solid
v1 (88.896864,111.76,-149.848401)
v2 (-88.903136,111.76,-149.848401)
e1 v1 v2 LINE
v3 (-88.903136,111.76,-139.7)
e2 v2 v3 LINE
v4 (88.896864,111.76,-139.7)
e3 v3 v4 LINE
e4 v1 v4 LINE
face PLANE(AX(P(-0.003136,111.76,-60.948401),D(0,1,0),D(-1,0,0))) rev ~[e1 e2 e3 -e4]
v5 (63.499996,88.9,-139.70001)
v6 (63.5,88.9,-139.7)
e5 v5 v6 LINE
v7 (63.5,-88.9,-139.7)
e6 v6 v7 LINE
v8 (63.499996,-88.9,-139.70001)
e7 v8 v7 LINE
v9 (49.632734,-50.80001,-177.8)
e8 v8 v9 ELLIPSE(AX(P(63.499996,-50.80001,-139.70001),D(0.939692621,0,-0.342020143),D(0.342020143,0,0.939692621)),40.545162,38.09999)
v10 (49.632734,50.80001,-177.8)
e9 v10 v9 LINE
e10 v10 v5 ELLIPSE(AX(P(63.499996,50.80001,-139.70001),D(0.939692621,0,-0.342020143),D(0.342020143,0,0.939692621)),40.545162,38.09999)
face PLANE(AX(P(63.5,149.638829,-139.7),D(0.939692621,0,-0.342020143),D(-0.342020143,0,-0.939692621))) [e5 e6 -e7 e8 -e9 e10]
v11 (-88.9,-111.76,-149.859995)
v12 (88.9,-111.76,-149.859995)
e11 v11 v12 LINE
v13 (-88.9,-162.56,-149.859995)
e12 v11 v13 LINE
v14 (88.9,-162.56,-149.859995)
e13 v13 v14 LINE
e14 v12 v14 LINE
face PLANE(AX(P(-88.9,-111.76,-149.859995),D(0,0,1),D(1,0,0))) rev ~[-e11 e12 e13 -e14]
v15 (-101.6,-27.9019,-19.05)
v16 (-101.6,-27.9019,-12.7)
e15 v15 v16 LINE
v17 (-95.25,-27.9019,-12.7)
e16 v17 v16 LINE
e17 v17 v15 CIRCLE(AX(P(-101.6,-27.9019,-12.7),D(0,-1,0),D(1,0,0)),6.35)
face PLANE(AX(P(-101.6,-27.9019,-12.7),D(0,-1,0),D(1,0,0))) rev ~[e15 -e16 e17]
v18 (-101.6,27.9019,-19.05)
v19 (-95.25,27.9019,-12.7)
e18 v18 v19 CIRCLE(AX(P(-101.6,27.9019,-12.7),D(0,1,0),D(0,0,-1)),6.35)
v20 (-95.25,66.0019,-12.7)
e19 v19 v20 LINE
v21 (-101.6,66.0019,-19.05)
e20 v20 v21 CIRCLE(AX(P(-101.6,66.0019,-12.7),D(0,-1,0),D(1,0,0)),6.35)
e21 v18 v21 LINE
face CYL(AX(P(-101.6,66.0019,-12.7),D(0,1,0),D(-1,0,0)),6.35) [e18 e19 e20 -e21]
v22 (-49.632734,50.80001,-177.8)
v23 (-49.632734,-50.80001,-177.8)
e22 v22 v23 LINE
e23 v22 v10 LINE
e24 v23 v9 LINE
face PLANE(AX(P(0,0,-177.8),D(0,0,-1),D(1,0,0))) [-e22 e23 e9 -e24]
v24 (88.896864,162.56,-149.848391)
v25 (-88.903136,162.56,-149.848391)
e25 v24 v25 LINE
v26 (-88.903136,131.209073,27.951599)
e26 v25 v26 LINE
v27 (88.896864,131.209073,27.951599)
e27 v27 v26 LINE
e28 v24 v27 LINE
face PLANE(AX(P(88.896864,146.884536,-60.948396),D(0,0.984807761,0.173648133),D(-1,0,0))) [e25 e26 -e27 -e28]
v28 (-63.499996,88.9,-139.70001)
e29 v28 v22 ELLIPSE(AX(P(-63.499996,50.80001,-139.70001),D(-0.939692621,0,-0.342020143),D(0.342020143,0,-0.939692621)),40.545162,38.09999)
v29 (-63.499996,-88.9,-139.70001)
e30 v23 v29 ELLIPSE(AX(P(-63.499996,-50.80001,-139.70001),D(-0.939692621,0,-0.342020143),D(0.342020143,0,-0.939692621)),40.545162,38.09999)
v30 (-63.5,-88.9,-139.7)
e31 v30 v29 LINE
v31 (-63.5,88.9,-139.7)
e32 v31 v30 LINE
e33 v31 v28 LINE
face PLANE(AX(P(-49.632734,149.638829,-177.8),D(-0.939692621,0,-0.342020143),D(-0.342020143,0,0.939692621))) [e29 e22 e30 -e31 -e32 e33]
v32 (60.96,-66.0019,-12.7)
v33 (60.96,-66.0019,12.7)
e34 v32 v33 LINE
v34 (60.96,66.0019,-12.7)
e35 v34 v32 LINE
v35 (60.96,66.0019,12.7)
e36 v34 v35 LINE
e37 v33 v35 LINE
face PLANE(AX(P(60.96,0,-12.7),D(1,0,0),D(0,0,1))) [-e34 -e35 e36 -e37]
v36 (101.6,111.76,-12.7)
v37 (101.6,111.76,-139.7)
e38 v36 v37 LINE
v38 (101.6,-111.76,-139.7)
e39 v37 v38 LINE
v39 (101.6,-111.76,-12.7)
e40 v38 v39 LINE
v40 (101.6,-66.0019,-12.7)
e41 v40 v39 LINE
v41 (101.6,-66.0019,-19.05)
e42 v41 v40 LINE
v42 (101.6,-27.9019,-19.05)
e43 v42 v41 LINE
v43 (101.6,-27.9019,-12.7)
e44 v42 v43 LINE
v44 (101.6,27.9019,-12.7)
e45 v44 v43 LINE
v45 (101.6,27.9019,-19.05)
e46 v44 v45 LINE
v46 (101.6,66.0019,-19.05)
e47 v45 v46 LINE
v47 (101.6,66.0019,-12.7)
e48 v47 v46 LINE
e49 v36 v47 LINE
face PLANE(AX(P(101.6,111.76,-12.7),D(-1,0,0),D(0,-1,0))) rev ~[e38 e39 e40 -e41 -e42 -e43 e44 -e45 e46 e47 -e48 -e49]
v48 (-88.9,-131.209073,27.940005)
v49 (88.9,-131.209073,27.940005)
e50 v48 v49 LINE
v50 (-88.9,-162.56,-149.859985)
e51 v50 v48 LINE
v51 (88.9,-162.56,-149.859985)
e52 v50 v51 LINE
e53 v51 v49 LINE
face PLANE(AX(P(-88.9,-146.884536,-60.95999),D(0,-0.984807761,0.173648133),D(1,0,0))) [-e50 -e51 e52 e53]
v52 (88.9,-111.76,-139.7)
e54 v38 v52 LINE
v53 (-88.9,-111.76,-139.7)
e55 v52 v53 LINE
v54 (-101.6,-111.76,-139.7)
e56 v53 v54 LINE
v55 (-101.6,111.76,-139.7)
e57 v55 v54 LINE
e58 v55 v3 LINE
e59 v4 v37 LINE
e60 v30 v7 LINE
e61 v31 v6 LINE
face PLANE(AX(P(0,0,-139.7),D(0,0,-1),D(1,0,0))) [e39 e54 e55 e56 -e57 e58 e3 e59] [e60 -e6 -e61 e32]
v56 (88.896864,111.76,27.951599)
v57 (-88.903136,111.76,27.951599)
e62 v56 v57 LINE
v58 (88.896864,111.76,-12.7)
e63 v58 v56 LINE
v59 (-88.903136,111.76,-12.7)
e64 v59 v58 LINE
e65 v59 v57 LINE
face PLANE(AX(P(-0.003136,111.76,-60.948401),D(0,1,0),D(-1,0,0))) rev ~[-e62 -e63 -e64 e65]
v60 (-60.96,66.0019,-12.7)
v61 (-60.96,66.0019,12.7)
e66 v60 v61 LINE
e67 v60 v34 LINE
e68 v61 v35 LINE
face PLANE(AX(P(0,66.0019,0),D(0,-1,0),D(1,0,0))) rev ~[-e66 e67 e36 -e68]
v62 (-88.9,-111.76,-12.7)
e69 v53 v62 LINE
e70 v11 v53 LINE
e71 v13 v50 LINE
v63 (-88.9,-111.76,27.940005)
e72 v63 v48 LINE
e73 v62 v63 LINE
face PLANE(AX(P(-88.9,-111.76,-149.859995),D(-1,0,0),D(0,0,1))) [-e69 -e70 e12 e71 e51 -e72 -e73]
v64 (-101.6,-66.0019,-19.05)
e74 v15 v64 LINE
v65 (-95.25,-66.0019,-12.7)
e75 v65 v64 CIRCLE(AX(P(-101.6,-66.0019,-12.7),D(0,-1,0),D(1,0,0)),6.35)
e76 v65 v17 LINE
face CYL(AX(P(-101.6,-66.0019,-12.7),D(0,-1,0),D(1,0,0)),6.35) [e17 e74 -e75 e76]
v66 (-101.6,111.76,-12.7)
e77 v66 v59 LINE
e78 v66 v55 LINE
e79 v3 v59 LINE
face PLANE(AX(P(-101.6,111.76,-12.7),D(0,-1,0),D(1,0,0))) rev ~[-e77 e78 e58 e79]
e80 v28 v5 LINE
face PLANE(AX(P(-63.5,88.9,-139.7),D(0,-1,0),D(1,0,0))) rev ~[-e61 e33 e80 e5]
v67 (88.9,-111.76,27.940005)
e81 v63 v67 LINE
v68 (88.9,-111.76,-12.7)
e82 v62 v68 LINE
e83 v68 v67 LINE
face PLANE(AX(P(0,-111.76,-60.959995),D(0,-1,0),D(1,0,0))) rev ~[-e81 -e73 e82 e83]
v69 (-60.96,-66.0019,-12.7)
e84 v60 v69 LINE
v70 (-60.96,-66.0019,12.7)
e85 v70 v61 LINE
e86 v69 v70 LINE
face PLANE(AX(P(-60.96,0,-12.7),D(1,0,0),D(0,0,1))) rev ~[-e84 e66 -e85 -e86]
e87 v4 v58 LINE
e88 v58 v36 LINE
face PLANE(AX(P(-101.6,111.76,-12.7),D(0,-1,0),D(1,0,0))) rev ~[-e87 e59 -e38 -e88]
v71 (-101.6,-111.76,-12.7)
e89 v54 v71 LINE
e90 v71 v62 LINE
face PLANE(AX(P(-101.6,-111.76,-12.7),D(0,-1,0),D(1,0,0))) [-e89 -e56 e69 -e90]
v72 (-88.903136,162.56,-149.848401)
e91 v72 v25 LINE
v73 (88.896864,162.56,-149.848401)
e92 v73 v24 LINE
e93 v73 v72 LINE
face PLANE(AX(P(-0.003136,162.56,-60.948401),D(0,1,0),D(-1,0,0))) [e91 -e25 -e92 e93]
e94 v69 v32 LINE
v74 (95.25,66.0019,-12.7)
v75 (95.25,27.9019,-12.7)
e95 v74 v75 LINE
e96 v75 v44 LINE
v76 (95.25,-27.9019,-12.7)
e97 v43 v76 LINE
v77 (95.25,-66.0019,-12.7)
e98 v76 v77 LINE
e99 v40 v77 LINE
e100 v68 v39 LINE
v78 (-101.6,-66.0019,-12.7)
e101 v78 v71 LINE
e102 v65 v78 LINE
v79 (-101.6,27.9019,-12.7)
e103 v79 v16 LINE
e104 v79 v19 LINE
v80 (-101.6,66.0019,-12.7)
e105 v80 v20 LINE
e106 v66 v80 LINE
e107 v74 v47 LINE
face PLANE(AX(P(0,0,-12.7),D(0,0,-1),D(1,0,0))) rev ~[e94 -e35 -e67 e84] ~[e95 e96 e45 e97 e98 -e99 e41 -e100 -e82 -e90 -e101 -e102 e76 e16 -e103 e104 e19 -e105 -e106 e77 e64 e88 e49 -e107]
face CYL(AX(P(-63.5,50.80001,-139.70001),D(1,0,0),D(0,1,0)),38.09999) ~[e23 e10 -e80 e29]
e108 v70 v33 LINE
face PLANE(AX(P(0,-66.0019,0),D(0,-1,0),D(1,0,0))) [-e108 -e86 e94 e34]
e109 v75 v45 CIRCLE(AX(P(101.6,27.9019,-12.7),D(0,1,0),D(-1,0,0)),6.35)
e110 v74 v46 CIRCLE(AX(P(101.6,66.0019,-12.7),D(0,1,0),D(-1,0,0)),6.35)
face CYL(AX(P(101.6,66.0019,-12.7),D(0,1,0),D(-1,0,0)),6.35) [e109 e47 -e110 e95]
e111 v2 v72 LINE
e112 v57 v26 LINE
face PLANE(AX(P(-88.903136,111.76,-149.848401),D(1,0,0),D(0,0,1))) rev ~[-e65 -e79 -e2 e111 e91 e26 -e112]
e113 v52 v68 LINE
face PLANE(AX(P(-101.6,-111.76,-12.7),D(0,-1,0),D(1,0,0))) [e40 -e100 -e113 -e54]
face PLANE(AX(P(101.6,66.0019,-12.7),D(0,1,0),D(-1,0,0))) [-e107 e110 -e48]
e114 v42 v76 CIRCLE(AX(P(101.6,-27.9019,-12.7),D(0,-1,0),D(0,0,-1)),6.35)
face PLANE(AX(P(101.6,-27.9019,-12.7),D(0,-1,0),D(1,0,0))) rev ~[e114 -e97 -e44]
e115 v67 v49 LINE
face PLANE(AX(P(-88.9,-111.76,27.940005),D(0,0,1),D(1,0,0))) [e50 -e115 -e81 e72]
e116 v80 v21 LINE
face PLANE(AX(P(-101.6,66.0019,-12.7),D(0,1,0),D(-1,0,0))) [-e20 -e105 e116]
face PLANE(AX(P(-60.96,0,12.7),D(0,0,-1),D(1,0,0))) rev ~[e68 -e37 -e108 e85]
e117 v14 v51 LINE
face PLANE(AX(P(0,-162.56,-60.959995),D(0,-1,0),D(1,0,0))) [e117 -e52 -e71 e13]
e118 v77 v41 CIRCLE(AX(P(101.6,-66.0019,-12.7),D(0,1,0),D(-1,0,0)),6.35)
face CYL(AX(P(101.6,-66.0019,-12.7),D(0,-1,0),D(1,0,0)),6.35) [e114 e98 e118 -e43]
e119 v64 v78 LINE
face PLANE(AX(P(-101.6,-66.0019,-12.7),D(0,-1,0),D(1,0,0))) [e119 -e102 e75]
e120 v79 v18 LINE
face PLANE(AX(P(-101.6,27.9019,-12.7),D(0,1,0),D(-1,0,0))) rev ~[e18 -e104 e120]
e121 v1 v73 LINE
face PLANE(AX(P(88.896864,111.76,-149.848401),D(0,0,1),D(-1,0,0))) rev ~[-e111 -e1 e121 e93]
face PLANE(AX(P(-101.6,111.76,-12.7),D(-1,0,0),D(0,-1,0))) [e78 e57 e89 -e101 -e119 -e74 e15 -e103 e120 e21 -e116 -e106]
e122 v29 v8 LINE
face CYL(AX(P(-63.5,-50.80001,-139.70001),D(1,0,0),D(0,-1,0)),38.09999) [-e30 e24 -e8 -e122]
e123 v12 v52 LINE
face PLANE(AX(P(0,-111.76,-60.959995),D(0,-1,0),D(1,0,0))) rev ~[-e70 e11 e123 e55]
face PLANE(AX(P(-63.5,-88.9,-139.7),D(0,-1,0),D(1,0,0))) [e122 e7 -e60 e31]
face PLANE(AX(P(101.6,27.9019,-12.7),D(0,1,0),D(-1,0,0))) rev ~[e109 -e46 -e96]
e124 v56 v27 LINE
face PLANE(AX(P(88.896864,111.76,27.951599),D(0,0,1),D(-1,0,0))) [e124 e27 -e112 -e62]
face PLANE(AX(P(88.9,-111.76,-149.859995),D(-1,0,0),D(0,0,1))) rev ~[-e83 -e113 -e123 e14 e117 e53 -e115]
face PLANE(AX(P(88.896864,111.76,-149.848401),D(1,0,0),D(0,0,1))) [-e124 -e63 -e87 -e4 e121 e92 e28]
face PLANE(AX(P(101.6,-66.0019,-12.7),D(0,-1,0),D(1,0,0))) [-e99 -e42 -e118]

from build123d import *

# Parameters (mm, degrees)
F0_W        = 121.92
F0_H        = 25.4
F1_DEPTH    = 66.0019
F2_W        = 203.2
F2_H        = 223.52
F3_DEPTH    = 25.4
F2_W_2      = 121.92
F2_H_2      = 132.0038
F4_DEPTH    = 127
F5_W        = 127
F5_H        = 177.8
F6_DEPTH    = 38.1
F7_R        = 38.09999
F8_T1_DEPTH = 299.2776586204
F9_W        = 177.8
F9_H        = 177.8
F10_DEPTH   = 50.8
F11_SIZE2   = 31.350927
F11_SIZE    = 177.79999
F12_W       = 177.8
F12_H       = 177.8
F13_DEPTH   = 50.8
F14_SIZE2   = 31.350927
F14_SIZE    = 177.79999
F15_R       = 6.35
F16_DEPTH   = 38.1
F17_R       = 6.35
F18_DEPTH   = 38.1
F19_R       = 6.35
F20_DEPTH   = 38.1
F21_R       = 6.35
F22_DEPTH   = 38.1


# Not quite as in the source:
# - a fillet or chamfer that OpenCascade refuses, or shapes differently, is made with other operations: its cross-section is extruded or revolved along the edge and cut away or added
# - a fillet or chamfer is up to 0.001 mm smaller than in the source, because OpenCascade refuses the exact size


with BuildPart() as f1:
    # F0 (on Front) → F1 (new body, symmetric)
    with BuildSketch(Plane.XZ):
        Rectangle(F0_W, F0_H)
    extrude(amount=F1_DEPTH, both=True)

    # F2 (on face) → F3 (join)
    with BuildSketch(Plane(origin=(0, 0, -12.7), x_dir=(1, 0, 0), z_dir=(0, 0, -1))):
        Rectangle(F2_W, F2_H)
    extrude(amount=F3_DEPTH)

    # F2 (on face) → F4 (join)
    with BuildSketch(Plane(origin=(0, 0, -12.7), x_dir=(1, 0, 0), z_dir=(0, 0, -1))):
        Rectangle(F2_W, F2_H)
        Rectangle(F2_W_2, F2_H_2, mode=Mode.SUBTRACT)
        Rectangle(F2_W_2, F2_H_2)
    extrude(amount=F4_DEPTH)

    # F5 (on face) → F6 (join)
    with BuildSketch(Plane(origin=(0, 0, -139.7), x_dir=(1, 0, 0), z_dir=(0, 0, -1))):
        Rectangle(F5_W, F5_H)
    extrude(amount=F6_DEPTH)

    # F7 (radius 38.1 in the source; OpenCascade refuses exactly that, so slightly less here)
    f7_edges = [f1.edges().sort_by_distance(p)[0] for p in [
        (0, -88.9, -177.8),
        (0, 88.9, -177.8),
    ]]
    fillet(f7_edges, radius=F7_R)

    # F8: chamfer of 38.1 x 13.8672659255 on 2 edges, made by hand

    # F8_s2 → F8_t1 (cut)
    with BuildSketch(Plane.XZ.offset(-149.6388293102)):
        Polygon((63.5, -139.7), (49.6327340745, -177.8), (63.5, -177.8), align=None)
        Polygon((-49.6327340745, -177.8), (-63.5, -139.7), (-63.5, -177.8), align=None)
    extrude(amount=F8_T1_DEPTH, mode=Mode.SUBTRACT)

    # F9 (on face) → F10 (join)
    with BuildSketch(Plane.XZ.offset(111.76)):
        with Locations((1.431e-07, -60.9599946499)):
            Rectangle(F9_W, F9_H)
    extrude(amount=F10_DEPTH)

    # F11 (size 177.8 and 31.35093717 in the source; OpenCascade refuses exactly that, so slightly less here)
    f11_edges = [f1.edges().sort_by_distance(p)[0] for p in [
        (0, -162.56, 27.940005),
    ]]
    f11_side = f1.faces().sort_by_distance((0, -162.56, -60.959995))[0]
    chamfer(f11_edges, length=F11_SIZE, length2=F11_SIZE2, reference=f11_side)

    # F12 (on face) → F13 (join)
    with BuildSketch(Plane(origin=(0, 111.76, 0), x_dir=(-1, 0, 0), z_dir=(0, 1, 0))):
        with Locations((0.0031362507, -60.9484007582)):
            Rectangle(F12_W, F12_H)
    extrude(amount=F13_DEPTH)

    # F14 (size 177.8 and 31.35093717 in the source; OpenCascade refuses exactly that, so slightly less here)
    f14_edges = [f1.edges().sort_by_distance(p)[0] for p in [
        (-0.003136, 162.56, 27.951599),
    ]]
    f14_side = f1.faces().sort_by_distance((-0.003136, 162.56, -60.948401))[0]
    chamfer(f14_edges, length=F14_SIZE, length2=F14_SIZE2, reference=f14_side)

    # F15 (on face) → F16 (join)
    with BuildSketch(Plane(origin=(0, 66.0019, 0), x_dir=(-1, 0, 0), z_dir=(0, 1, 0))):
        with Locations((101.6, -12.7)):
            Circle(F15_R)
    extrude(amount=-F16_DEPTH)

    # F17 (on face) → F18 (join)
    with BuildSketch(Plane.XZ.offset(66.0019)):
        with Locations((-101.6, -12.7)):
            Circle(F17_R)
    extrude(amount=-F18_DEPTH)

    # F19 (on face) → F20 (join)
    with BuildSketch(Plane.XZ.offset(66.0019)):
        with Locations((101.6, -12.7)):
            Circle(F19_R)
    extrude(amount=-F20_DEPTH)

    # F21 (on face) → F22 (join)
    with BuildSketch(Plane(origin=(0, 66.0019, 0), x_dir=(-1, 0, 0), z_dir=(0, 1, 0))):
        with Locations((-101.6, -12.7)):
            Circle(F21_R)
    extrude(amount=-F22_DEPTH)


solid = f1.part
